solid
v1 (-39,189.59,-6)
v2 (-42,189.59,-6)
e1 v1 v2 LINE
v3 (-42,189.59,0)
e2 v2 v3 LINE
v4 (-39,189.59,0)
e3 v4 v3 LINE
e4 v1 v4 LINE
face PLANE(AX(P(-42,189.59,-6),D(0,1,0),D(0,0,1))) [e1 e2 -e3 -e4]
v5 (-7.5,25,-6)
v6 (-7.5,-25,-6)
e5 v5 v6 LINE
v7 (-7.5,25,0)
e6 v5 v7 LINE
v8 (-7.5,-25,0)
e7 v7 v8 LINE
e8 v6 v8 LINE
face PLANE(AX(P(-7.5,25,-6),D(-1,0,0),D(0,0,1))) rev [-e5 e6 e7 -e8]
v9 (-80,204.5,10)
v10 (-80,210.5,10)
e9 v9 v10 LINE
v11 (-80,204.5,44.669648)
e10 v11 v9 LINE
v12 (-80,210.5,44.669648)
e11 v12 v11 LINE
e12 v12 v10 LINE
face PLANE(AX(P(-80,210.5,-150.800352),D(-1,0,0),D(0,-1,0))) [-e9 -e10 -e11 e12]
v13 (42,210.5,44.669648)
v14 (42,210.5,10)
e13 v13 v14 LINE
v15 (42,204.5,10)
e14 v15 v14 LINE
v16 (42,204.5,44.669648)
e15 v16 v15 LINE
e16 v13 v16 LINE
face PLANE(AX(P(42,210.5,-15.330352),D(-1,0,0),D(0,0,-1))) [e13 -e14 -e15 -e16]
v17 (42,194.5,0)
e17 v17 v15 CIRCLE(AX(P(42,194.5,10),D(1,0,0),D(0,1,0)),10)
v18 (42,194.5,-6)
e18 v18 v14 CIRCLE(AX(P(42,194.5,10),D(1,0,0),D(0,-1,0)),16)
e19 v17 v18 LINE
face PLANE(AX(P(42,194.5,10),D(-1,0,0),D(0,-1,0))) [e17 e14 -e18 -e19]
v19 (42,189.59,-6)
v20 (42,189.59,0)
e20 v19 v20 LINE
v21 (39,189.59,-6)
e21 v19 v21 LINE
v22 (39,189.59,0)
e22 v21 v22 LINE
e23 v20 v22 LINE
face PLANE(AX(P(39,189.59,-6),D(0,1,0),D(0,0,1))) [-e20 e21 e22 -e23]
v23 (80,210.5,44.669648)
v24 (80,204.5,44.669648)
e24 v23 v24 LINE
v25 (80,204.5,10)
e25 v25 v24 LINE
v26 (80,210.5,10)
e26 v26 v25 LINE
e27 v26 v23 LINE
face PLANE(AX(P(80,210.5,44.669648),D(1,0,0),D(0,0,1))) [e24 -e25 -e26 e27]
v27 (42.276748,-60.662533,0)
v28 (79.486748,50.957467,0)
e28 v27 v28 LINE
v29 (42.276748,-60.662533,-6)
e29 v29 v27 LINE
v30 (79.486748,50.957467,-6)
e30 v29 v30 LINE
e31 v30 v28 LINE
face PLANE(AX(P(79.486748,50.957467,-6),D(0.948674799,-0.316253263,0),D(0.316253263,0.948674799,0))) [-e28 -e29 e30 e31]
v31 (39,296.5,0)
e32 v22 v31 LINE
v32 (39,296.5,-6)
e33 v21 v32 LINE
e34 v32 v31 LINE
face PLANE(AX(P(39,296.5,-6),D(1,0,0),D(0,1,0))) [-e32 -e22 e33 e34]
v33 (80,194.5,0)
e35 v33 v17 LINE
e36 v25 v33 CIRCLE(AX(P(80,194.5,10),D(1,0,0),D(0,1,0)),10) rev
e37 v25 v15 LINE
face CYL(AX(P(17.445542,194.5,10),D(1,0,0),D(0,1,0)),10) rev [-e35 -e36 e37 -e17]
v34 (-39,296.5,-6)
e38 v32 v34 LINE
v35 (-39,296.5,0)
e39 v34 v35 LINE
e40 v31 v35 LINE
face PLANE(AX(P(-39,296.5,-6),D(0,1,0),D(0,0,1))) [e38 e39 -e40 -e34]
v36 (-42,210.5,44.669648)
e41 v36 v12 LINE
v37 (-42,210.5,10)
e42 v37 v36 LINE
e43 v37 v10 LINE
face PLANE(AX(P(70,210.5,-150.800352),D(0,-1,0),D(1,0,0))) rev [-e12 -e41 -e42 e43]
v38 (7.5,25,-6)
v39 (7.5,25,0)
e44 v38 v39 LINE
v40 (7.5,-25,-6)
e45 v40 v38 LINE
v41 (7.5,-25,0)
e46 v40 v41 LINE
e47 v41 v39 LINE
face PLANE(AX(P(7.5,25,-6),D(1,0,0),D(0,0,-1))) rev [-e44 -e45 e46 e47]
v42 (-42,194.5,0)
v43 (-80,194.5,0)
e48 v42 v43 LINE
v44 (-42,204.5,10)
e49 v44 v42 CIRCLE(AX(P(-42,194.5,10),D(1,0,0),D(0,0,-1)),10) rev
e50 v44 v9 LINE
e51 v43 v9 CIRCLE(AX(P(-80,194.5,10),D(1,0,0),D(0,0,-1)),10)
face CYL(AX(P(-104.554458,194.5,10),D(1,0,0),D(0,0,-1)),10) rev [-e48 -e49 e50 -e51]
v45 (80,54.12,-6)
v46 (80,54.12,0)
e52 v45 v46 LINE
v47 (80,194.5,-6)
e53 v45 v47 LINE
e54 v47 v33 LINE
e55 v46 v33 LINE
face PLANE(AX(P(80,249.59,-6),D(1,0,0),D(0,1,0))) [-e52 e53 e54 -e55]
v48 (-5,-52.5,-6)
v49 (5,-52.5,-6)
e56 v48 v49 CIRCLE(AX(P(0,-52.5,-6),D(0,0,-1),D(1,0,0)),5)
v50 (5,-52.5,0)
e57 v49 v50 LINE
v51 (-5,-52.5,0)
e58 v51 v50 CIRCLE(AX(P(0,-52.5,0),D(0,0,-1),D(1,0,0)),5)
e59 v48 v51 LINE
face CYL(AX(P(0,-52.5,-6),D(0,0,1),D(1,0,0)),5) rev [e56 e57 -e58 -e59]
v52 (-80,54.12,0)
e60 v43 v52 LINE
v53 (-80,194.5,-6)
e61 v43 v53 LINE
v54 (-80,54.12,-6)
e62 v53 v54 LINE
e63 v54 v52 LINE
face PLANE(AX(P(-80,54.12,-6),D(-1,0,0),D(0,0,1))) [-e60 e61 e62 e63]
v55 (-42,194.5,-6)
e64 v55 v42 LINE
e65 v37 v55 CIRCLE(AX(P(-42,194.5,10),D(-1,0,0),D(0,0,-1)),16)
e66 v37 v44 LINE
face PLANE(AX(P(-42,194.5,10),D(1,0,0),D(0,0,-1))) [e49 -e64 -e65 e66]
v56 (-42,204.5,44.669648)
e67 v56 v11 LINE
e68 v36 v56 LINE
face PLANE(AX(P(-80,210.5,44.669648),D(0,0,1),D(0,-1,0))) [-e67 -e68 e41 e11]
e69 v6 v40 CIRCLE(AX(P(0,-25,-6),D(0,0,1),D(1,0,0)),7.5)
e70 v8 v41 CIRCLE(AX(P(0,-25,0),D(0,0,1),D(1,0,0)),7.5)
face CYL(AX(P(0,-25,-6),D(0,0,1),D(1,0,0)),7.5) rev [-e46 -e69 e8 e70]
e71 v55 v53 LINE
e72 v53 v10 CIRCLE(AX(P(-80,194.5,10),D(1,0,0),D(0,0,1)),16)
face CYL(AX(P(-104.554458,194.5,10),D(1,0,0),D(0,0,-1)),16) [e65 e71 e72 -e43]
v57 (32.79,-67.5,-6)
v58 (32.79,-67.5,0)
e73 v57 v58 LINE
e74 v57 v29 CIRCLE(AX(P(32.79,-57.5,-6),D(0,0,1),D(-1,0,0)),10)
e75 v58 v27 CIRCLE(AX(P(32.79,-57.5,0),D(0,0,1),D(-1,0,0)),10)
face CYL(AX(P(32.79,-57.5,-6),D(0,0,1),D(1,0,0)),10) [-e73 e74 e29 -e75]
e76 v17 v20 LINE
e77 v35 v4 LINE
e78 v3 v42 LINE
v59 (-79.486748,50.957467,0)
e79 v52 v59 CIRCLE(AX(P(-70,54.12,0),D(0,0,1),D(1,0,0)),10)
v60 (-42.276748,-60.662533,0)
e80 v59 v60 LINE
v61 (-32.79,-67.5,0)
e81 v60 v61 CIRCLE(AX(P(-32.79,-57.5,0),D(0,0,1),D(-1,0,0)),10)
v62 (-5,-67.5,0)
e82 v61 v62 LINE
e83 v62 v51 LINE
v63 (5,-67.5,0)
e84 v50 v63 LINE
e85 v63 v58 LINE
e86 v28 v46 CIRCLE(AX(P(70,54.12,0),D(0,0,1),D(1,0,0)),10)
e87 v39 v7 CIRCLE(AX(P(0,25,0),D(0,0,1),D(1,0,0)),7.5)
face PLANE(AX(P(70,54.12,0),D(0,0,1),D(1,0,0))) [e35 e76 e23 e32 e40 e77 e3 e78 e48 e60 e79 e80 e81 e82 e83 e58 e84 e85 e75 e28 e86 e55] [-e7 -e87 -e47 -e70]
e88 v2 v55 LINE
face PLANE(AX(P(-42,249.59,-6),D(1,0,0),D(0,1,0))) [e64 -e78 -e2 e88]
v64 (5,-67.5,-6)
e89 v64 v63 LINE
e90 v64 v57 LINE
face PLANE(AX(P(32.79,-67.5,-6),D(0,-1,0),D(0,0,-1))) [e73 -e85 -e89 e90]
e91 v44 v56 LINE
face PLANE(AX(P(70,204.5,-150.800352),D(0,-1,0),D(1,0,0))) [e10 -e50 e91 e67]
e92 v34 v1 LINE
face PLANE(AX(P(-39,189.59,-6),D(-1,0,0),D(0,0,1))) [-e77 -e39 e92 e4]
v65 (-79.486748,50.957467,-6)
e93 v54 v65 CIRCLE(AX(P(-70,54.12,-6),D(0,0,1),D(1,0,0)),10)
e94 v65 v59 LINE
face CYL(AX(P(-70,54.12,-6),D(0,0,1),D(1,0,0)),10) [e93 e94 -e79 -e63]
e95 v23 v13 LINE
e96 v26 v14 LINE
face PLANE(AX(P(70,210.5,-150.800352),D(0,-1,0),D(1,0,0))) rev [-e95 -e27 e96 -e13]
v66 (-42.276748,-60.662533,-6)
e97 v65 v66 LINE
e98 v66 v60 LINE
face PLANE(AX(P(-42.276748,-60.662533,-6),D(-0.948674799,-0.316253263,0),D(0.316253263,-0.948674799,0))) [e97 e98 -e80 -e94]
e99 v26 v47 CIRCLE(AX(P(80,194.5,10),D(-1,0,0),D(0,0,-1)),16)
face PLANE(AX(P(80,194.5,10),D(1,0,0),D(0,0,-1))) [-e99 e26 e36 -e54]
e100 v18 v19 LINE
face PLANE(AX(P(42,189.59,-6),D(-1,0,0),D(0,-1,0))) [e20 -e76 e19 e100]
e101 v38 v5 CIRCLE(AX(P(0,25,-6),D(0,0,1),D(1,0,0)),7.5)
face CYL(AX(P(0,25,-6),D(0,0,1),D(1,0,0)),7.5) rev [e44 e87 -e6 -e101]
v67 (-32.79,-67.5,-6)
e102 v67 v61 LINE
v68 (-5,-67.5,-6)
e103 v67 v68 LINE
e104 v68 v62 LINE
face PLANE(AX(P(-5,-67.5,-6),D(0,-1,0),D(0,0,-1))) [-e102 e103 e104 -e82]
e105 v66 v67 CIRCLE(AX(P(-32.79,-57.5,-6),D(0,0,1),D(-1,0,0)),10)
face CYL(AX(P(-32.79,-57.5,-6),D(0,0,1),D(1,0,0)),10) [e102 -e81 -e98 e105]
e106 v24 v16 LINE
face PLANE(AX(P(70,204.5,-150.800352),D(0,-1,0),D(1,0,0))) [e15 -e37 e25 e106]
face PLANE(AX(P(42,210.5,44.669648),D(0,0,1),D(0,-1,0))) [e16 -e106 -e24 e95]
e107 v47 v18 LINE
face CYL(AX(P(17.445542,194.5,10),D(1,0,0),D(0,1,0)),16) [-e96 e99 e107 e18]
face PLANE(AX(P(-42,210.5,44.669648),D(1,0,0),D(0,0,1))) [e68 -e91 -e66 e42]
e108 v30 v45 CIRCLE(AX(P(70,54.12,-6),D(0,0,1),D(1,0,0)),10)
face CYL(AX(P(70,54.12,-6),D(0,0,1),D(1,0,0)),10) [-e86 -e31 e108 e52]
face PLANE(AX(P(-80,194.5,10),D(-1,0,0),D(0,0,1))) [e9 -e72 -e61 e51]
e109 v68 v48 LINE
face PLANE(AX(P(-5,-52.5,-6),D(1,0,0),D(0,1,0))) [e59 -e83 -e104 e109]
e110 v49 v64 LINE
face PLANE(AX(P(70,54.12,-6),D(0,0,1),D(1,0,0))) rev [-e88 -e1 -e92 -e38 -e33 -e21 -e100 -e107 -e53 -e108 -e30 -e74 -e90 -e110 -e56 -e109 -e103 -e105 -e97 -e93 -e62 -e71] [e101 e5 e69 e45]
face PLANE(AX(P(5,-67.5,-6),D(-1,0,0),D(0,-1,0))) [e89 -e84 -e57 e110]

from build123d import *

# Parameters (mm, degrees)
BASE_FLANGE1_DEPTH     = 6
SKETCHED_START         = -80
SKETCHED_BEND1_DEPTH   = 38
SKETCHED_START_2       = 42
SKETCHED_BEND1_2_DEPTH = 38
SKETCHED_BEND1_3_DEPTH = 38
SKETCHED_BEND1_4_DEPTH = 38


# Read off the part's stored shape, not the designer's step: Sketched Bend1
# Sheet-metal steps are written as plain solids
with BuildPart() as part:
    # Sketch1 → Base-Flange1 (new body)
    with BuildSketch(Plane.XY):
        with BuildLine():
            Line((80, 189.59), (80, 54.12))
            ThreePointArc((80, 54.12), (79.87085305, 52.518044922), (79.486747986, 50.957467367))
            Line((79.486747986, 50.957467367), (42.276747986, -60.662532633))
            ThreePointArc((42.276747986, -60.662532633), (38.636993829, -65.612500426), (32.79, -67.5))
            Line((32.79, -67.5), (5, -67.5))
            Line((5, -67.5), (5, -52.5))
            ThreePointArc((5, -52.5), (0, -47.5), (-5, -52.5))
            Line((-5, -52.5), (-5, -67.5))
            Line((-5, -67.5), (-32.79, -67.5))
            ThreePointArc((-32.79, -67.5), (-38.636993829, -65.612500426), (-42.276747986, -60.662532633))
            Line((-42.276747986, -60.662532633), (-79.486747986, 50.957467367))
            ThreePointArc((-79.486747986, 50.957467367), (-79.87085305, 52.518044922), (-80, 54.12))
            Line((-80, 54.12), (-80, 189.59))
            Line((-80, 189.59), (-80, 249.59))
            Line((-80, 249.59), (-42, 249.59))
            Line((-42, 249.59), (-42, 189.59))
            Line((-42, 189.59), (-39, 189.59))
            Line((-39, 189.59), (-39, 296.5))
            Line((-39, 296.5), (39, 296.5))
            Line((39, 296.5), (39, 189.59))
            Line((39, 189.59), (42, 189.59))
            Line((42, 189.59), (42, 249.59))
            Line((42, 249.59), (80, 249.59))
            Line((80, 249.59), (80, 189.59))
        make_face()
        with BuildLine():
            Line((7.5, 25), (7.5, -25))
            ThreePointArc((7.5, -25), (0, -32.5), (-7.5, -25))
            Line((-7.5, -25), (-7.5, 25))
            ThreePointArc((-7.5, 25), (0, 32.5), (7.5, 25))
        make_face(mode=Mode.SUBTRACT)
    extrude(amount=-BASE_FLANGE1_DEPTH)

    # Sketched Bend1 outline → Sketched Bend1 (cut)
    with BuildSketch(Plane.YZ.offset(SKETCHED_START)):
        with BuildLine():
            Line((249.59, 0), (206.989995997, 0))
            ThreePointArc((206.989995997, 0), (201.42820323, -4.422205102), (194.5, -6))
            Line((194.5, -6), (249.59, -6))
            Line((249.59, -6), (249.59, 0))
        make_face()
    extrude(amount=SKETCHED_BEND1_DEPTH, mode=Mode.SUBTRACT)

    # Sketched Bend1 2 outline → Sketched Bend1 2 (cut)
    with BuildSketch(Plane.YZ.offset(SKETCHED_START_2)):
        with BuildLine():
            Line((249.59, 0), (206.989995997, 0))
            ThreePointArc((206.989995997, 0), (201.42820323, -4.422205102), (194.5, -6))
            Line((194.5, -6), (249.59, -6))
            Line((249.59, -6), (249.59, 0))
        make_face()
    extrude(amount=SKETCHED_BEND1_2_DEPTH, mode=Mode.SUBTRACT)

    # Sketched Bend1 3 outline → Sketched Bend1 3 (add)
    with BuildSketch(Plane.YZ.offset(SKETCHED_START)):
        with BuildLine():
            Line((210.5, 10), (210.5, 44.669647752))
            Line((210.5, 44.669647752), (204.5, 44.669647752))
            Line((204.5, 44.669647752), (204.5, 10))
            ThreePointArc((204.5, 10), (201.571067812, 2.928932188), (194.5, 0))
            Line((194.5, 0), (206.989995997, 0))
            ThreePointArc((206.989995997, 0), (209.597018513, 4.700940458), (210.5, 10))
        make_face()
    extrude(amount=SKETCHED_BEND1_3_DEPTH)

    # Sketched Bend1 4 outline → Sketched Bend1 4 (add)
    with BuildSketch(Plane.YZ.offset(SKETCHED_START_2)):
        with BuildLine():
            Line((210.5, 10), (210.5, 44.669647752))
            Line((210.5, 44.669647752), (204.5, 44.669647752))
            Line((204.5, 44.669647752), (204.5, 10))
            ThreePointArc((204.5, 10), (201.571067812, 2.928932188), (194.5, 0))
            Line((194.5, 0), (206.989995997, 0))
            ThreePointArc((206.989995997, 0), (209.597018513, 4.700940458), (210.5, 10))
        make_face()
    extrude(amount=SKETCHED_BEND1_4_DEPTH)


solid = part.part
